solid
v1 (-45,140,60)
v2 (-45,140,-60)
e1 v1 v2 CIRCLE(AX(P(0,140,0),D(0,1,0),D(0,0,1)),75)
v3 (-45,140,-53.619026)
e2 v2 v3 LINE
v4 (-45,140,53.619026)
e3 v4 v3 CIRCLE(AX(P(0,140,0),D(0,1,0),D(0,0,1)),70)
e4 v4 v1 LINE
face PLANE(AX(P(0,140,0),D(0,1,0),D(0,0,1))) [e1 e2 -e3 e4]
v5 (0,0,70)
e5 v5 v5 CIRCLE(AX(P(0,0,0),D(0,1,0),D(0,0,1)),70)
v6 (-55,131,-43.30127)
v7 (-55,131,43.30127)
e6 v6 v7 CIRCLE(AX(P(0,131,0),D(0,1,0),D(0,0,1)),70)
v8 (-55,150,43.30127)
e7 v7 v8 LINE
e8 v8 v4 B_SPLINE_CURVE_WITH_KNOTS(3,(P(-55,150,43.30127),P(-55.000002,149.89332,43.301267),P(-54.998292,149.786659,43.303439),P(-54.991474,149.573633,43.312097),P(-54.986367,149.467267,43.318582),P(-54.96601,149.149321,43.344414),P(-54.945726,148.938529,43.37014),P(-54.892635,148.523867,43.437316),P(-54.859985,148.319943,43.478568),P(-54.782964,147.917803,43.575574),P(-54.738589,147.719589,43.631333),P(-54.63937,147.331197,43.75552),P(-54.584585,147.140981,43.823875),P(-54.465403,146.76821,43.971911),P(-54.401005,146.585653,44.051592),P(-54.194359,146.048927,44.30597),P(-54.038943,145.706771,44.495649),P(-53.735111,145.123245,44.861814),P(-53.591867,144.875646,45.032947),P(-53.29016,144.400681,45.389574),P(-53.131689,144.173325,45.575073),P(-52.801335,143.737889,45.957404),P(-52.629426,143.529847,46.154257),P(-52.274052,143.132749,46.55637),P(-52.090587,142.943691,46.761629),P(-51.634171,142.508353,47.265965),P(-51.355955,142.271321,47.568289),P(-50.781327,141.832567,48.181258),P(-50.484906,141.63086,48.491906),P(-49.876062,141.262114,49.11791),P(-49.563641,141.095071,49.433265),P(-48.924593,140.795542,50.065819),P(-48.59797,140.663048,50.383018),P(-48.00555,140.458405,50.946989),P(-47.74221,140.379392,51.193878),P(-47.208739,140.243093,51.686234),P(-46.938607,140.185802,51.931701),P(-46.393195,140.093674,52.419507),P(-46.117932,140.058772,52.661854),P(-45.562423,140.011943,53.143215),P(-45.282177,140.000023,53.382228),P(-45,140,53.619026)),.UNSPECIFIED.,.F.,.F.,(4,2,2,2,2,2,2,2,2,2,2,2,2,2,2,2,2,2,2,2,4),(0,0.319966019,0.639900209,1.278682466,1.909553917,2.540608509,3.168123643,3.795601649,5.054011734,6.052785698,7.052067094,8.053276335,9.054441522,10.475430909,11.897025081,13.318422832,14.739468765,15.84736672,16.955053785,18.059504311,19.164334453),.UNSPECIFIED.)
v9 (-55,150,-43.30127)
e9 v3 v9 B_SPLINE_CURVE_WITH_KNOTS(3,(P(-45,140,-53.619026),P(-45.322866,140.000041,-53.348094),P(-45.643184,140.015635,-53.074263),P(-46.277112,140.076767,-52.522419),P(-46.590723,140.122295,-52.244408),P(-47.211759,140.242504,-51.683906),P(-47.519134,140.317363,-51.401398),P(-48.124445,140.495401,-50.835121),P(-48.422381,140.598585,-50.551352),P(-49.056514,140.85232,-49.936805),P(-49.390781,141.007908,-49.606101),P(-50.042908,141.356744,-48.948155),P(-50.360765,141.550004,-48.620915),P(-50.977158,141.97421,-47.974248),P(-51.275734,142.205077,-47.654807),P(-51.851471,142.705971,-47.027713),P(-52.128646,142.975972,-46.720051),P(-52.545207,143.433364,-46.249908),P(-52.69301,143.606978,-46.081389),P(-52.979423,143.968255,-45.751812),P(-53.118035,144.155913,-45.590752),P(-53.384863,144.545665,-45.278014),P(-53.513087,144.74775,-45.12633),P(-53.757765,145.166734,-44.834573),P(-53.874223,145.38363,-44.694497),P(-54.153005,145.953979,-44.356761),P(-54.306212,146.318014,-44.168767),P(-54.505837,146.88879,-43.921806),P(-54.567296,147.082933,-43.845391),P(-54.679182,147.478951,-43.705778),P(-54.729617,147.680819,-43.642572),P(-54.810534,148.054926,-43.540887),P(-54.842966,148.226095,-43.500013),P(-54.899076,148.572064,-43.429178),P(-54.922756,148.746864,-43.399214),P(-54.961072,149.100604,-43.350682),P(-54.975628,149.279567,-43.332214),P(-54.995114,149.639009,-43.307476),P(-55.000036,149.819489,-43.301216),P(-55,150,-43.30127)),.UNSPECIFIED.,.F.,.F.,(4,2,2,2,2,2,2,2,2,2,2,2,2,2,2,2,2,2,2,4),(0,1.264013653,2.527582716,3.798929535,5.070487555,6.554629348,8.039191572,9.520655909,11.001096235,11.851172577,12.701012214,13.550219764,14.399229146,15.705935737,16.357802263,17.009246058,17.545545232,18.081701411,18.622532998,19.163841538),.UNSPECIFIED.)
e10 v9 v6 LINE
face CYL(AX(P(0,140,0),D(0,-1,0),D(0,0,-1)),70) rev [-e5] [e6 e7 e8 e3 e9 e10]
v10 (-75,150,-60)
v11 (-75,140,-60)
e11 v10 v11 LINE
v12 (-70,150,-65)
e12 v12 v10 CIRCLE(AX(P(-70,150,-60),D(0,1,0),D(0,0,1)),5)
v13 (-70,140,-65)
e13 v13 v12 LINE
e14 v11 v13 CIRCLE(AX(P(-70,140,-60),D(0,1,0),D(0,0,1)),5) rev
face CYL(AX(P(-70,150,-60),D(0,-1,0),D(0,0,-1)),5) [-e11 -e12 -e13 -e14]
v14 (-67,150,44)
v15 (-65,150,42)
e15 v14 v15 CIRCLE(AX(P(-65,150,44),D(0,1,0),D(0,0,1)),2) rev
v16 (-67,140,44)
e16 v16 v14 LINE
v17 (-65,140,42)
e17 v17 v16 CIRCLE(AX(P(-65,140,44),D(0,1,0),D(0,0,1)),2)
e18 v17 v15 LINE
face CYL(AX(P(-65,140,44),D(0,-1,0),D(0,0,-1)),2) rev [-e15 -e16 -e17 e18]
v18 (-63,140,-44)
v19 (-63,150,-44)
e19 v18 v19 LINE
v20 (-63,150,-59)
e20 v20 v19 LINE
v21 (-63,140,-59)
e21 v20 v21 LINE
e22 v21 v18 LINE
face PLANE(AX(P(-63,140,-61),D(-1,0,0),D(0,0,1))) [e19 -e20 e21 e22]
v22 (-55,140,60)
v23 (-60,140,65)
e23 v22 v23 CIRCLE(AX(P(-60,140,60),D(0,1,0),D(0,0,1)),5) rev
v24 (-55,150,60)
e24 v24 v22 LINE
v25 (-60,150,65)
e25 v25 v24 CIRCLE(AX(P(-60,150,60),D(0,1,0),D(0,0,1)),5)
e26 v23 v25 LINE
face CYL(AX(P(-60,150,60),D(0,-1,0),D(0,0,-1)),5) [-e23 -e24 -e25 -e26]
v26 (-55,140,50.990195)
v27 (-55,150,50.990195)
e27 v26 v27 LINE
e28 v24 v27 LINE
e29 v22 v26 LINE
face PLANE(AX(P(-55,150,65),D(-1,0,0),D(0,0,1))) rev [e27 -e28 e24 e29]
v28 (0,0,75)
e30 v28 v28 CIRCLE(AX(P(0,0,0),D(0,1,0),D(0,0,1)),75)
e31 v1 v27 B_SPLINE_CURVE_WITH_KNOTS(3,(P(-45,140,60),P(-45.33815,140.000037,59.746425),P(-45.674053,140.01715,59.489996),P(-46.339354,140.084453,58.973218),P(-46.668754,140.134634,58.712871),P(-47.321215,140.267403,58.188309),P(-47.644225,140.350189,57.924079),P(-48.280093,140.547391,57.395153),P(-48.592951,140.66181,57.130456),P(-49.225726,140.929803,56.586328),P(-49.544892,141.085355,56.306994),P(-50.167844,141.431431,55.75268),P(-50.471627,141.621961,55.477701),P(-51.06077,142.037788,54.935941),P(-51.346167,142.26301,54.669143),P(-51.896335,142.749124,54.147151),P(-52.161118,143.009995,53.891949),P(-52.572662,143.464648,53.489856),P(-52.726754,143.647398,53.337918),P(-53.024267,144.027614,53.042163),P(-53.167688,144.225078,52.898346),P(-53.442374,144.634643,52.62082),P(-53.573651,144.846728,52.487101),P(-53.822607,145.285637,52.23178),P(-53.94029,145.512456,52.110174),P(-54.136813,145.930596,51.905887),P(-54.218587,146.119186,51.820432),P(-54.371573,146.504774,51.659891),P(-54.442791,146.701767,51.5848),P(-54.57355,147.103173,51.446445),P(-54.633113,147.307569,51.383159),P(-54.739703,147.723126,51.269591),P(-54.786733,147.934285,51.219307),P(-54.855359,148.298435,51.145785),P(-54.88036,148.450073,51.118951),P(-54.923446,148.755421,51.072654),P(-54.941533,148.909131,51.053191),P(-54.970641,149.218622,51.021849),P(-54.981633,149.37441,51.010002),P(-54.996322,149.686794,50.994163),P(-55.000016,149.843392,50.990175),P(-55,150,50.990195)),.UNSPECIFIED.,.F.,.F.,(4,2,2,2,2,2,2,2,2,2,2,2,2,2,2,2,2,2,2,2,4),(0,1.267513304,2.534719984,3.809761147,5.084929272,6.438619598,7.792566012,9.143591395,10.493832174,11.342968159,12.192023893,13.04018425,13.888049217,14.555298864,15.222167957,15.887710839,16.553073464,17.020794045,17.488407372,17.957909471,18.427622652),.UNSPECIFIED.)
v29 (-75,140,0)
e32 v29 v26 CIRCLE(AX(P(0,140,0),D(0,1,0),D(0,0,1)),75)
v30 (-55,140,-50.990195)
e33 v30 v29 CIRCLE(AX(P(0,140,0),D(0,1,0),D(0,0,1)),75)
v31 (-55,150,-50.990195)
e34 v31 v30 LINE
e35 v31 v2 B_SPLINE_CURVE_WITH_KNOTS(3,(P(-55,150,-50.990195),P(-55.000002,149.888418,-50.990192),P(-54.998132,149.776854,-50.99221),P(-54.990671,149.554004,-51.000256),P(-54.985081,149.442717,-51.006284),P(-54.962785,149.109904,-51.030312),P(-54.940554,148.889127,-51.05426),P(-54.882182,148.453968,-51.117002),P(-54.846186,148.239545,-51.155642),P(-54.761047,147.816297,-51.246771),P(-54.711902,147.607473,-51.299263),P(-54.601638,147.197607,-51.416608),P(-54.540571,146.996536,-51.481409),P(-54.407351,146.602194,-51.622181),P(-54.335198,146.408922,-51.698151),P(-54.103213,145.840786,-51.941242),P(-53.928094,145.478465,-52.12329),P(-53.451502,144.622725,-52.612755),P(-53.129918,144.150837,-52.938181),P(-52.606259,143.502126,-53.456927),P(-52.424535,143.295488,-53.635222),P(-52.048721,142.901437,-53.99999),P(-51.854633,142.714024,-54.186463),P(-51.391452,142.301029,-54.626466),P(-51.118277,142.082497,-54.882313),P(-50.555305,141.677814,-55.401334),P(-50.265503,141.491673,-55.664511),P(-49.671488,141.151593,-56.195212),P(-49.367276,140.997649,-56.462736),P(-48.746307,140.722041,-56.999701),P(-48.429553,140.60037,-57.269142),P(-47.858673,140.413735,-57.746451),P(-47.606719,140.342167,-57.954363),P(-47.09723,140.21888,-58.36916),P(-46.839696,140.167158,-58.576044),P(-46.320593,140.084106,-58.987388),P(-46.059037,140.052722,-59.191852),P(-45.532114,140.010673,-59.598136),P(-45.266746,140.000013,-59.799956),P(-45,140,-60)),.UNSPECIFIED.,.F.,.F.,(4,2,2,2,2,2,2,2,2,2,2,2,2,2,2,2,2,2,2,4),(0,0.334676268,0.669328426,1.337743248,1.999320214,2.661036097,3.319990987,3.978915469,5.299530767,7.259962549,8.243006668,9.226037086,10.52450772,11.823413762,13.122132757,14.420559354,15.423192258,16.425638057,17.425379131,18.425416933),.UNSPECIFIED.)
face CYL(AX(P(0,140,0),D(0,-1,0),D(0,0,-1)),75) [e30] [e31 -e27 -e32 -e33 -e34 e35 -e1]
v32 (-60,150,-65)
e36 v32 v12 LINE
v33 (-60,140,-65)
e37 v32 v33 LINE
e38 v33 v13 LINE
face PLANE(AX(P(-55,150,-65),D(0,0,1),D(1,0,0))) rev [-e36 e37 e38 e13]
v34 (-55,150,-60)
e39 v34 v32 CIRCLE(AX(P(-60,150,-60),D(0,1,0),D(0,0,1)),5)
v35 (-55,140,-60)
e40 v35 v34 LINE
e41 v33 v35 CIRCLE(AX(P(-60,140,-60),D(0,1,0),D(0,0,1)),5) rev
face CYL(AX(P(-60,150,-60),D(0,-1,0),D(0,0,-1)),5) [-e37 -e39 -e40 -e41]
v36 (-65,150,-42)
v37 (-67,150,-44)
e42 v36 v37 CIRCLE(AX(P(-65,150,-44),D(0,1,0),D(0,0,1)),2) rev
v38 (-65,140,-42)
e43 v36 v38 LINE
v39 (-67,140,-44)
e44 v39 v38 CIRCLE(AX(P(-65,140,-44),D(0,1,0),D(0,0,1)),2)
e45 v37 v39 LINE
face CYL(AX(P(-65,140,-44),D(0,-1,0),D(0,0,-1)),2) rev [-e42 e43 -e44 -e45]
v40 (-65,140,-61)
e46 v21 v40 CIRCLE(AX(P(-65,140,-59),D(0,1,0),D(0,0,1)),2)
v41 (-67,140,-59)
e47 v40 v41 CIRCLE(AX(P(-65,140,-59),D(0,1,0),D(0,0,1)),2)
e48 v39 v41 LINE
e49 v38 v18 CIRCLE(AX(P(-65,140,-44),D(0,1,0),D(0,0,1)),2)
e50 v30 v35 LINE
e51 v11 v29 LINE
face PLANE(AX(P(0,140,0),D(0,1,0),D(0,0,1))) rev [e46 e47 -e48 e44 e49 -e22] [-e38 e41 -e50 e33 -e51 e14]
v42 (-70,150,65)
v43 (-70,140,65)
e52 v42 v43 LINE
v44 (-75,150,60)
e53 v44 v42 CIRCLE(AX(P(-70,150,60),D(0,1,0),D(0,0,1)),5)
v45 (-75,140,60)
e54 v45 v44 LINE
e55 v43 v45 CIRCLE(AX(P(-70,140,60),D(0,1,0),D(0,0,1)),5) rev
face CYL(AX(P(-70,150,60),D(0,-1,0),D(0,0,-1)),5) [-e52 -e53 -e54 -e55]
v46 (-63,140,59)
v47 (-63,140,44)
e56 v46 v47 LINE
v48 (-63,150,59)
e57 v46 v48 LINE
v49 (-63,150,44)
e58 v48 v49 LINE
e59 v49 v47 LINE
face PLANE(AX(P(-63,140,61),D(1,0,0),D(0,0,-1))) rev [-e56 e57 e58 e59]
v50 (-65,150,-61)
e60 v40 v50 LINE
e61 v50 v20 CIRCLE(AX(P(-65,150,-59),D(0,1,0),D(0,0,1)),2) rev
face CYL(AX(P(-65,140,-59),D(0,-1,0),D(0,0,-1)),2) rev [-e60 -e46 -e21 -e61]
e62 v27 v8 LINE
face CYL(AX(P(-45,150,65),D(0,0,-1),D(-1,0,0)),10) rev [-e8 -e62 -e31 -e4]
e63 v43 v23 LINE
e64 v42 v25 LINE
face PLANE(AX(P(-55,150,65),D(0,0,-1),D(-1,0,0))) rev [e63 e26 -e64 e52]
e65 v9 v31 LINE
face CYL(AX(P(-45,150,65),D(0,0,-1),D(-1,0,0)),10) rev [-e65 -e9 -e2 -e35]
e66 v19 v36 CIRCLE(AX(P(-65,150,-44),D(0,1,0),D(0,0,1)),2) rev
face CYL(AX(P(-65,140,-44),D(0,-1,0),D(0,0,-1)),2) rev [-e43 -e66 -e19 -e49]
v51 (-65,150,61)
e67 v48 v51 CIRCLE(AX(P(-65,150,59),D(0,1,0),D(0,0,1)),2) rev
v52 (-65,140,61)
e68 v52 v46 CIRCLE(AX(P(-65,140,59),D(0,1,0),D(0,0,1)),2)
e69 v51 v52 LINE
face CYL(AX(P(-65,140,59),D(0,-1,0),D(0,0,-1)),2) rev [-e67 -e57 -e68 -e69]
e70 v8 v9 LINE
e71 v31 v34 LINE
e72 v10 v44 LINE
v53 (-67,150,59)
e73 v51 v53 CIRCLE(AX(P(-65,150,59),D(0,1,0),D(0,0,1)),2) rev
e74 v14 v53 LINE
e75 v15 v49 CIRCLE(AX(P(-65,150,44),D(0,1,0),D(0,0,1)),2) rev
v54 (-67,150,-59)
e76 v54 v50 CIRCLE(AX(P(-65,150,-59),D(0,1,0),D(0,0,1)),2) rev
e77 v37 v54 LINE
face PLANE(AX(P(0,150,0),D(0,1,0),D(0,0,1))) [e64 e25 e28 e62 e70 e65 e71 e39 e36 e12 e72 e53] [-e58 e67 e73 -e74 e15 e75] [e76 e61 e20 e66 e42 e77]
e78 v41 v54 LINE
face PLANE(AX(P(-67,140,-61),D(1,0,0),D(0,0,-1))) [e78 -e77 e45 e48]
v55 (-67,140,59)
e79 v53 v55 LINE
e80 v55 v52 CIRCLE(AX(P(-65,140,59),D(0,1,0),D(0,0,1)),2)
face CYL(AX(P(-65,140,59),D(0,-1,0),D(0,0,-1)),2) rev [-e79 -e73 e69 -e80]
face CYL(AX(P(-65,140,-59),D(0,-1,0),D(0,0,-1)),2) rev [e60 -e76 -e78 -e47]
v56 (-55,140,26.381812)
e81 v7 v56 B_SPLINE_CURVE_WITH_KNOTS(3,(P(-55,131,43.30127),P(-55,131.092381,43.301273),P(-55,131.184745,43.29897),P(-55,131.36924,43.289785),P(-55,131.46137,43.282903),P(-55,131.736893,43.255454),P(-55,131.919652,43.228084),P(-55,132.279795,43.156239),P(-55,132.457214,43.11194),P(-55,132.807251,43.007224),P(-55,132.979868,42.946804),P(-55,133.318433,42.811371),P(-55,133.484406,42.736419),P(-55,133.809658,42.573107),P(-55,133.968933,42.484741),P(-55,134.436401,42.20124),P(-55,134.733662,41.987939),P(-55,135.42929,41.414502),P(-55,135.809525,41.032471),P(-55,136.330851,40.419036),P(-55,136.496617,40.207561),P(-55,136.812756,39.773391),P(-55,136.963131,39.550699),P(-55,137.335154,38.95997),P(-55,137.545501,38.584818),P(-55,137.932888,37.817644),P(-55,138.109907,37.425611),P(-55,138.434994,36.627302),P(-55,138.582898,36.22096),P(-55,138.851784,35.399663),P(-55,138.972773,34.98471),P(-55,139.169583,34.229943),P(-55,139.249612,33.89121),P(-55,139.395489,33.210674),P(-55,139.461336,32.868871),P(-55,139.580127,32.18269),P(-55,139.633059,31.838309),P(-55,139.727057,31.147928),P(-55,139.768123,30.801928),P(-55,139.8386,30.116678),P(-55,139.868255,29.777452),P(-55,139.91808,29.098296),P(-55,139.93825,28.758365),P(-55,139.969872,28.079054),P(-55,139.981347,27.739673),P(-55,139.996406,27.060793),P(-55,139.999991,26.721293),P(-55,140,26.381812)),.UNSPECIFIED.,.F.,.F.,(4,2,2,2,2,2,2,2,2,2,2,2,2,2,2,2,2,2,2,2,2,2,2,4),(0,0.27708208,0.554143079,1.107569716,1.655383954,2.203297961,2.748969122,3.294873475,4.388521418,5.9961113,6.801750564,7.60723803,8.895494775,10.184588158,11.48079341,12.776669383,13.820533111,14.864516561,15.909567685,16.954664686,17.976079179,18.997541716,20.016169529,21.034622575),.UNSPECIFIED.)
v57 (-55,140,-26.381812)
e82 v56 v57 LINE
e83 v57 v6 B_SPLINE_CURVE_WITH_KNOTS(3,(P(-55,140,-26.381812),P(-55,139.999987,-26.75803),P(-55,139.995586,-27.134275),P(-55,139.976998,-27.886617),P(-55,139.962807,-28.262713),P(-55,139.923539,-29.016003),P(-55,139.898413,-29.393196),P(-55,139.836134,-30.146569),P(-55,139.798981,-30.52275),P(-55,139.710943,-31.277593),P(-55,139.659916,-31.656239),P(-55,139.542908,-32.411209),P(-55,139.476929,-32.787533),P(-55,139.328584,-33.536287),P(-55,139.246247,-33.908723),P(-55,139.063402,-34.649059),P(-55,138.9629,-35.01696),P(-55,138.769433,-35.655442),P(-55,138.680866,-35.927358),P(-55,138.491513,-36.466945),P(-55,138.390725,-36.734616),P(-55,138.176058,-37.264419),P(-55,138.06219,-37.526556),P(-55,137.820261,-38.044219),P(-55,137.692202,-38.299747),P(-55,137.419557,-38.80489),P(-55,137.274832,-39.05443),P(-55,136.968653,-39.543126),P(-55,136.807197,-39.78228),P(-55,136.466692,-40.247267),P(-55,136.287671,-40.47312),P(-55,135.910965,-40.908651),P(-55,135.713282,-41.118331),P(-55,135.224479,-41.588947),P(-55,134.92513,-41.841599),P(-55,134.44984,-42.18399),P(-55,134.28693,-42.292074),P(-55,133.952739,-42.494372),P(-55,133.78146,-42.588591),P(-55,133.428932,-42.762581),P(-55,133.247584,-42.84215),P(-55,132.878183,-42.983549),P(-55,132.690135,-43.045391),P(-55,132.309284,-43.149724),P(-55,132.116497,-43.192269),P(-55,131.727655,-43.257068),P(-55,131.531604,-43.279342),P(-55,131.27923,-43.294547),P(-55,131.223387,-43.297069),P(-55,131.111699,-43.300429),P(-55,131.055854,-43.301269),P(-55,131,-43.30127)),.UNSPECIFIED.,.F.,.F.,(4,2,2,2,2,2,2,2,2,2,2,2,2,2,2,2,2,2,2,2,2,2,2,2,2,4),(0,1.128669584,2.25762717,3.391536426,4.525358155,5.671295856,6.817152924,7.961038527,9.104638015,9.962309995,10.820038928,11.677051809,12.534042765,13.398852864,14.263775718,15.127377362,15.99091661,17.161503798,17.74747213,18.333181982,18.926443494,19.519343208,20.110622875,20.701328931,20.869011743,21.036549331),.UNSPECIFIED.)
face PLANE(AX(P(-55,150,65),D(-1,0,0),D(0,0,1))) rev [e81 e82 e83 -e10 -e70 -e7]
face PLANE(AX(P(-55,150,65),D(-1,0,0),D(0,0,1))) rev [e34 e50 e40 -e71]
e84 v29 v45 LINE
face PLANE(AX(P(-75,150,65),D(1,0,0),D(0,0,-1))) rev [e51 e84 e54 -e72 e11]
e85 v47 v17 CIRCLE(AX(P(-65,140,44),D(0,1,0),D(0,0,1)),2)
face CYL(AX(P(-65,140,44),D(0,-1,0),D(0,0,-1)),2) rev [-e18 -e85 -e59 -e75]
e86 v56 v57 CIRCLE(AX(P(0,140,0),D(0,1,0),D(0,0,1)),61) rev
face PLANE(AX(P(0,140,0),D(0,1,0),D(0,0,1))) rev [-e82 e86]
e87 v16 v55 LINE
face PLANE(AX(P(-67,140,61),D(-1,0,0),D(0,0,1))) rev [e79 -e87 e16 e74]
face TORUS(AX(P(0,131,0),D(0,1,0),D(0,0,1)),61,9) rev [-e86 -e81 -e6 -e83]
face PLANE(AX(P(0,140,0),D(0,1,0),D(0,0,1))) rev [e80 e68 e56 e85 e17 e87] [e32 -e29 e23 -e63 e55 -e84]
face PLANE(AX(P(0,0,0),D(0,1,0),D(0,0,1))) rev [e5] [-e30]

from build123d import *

# Parameters (mm, degrees)
SKETCH1_R            = 75
SKETCH1_R_2          = 70
BOSS_EXTRUDE1_DEPTH  = 140
SKETCH2_W            = 20
SKETCH2_H            = 130
BOSS_EXTRUDE2_DEPTH  = 10
FILLET1_R            = 9
FILLET2_R            = 10
FILLET3_R            = 5
SKETCH5_W            = 4
SKETCH5_H            = 19
CUT_EXTRUDE1_DEPTH   = 10
FILLET4_R            = 2
FILLET4_OF_MIRROR4_R = 2


# Some blends are built 0.0001 mm under size
with BuildPart() as part:
    # Sketch1 → Boss-Extrude1 (new body)
    with BuildSketch(Plane(origin=(0, 0, 0), x_dir=(1, 0, 0), z_dir=(0, 1, 0))):
        with Locations(Location((0, 0, 0), (0, 0, 270))):
            Circle(SKETCH1_R)
        with Locations(Location((0, 0, 0), (0, 0, 270))):
            Circle(SKETCH1_R_2, mode=Mode.SUBTRACT)
    extrude(amount=BOSS_EXTRUDE1_DEPTH)

    # Sketch2 → Boss-Extrude2 (add)
    with BuildSketch(Plane(origin=(0, 140, 0), x_dir=(1, 0, 0), z_dir=(0, 1, 0))):
        with Locations((-65, 0)):
            Rectangle(SKETCH2_W, SKETCH2_H)
    extrude(amount=BOSS_EXTRUDE2_DEPTH)

    # Fillet1
    # the kernel refuses this fillet: 9 mm, written as the material it adds along each edge
    with BuildSketch(Plane(origin=(0, 140, 0), x_dir=(-0.5499699922766536, 0, -0.835184415321082), z_dir=(0.835184415321082, 0, -0.5499699922766536))) as fillet1_piece_1_section:
        with BuildLine():
            CenterArc((70 - FILLET1_R, -FILLET1_R), FILLET1_R, 0, 90)
            Line((70 - FILLET1_R, 0), (70, 0))
            Line((70, 0), (70, -FILLET1_R))
        make_face()
    fillet1_piece_1 = revolve(axis=Axis((0, 140, 0), (0, 1, 0)), revolution_arc=113.270091323, mode=Mode.PRIVATE)
    fillet1_piece_1 = split(fillet1_piece_1, bisect_by=Plane(origin=(-55, 137.444603365, 0), z_dir=(-1, 0, 0)), keep=Keep.TOP, mode=Mode.PRIVATE)
    add(fillet1_piece_1)

    # Fillet2
    # the kernel refuses this fillet: 10 mm, written as the material it adds along each edge
    with BuildSketch(Plane(origin=(-55, 140, -75.990195136), x_dir=(0, 1, 0), z_dir=(0, 0, 1))) as fillet2_piece_1_section:
        with BuildLine():
            CenterArc((FILLET2_R, -FILLET2_R), FILLET2_R, 90, 90)
            Line((0, -FILLET2_R), (0, 0))
            Line((0, 0), (FILLET2_R, 0))
        make_face()
    fillet2_piece_1 = extrude(amount=57.688924947, mode=Mode.PRIVATE)
    fillet2_piece_1 = fillet2_piece_1 - Plane(origin=(0, 142.276585478, 0), x_dir=(0, 0, 1), z_dir=(0, -1, 0)) * Cylinder(70, 156, mode=Mode.PRIVATE)
    fillet2_piece_1 = fillet2_piece_1 & Plane(origin=(0, 142.276585478, 0), x_dir=(0, 0, 1), z_dir=(0, -1, 0)) * Cylinder(75, 156, mode=Mode.PRIVATE)
    add(fillet2_piece_1)
    with BuildSketch(Plane(origin=(-55, 140, 18.301270189), x_dir=(0, 1, 0), z_dir=(0, 0, 1))) as fillet2_piece_2_section:
        with BuildLine():
            CenterArc((FILLET2_R, -FILLET2_R), FILLET2_R, 90, 90)
            Line((0, -FILLET2_R), (0, 0))
            Line((0, 0), (FILLET2_R, 0))
        make_face()
    fillet2_piece_2 = extrude(amount=57.688924947, mode=Mode.PRIVATE)
    fillet2_piece_2 = fillet2_piece_2 - Plane(origin=(0, 142.276601392, 0), x_dir=(0, 0, 1), z_dir=(0, -1, 0)) * Cylinder(70, 156, mode=Mode.PRIVATE)
    fillet2_piece_2 = fillet2_piece_2 & Plane(origin=(0, 142.276601392, 0), x_dir=(0, 0, 1), z_dir=(0, -1, 0)) * Cylinder(75, 156, mode=Mode.PRIVATE)
    add(fillet2_piece_2)

    # Fillet3
    fillet3_edges = [part.edges().sort_by_distance(p)[0] for p in [
        (-75, 145, -65),
        (-75, 145, 65),
        (-55, 145, 65),
        (-55, 145, -65),
    ]]
    fillet(fillet3_edges, radius=FILLET3_R)

    # Sketch5 → Cut-Extrude1 (cut)
    with BuildSketch(Plane(origin=(0, 150, 0), x_dir=(1, 0, 0), z_dir=(0, 1, 0))):
        with Locations((-65, -51.5)):
            Rectangle(SKETCH5_W, SKETCH5_H)
    cut_extrude1 = extrude(amount=-CUT_EXTRUDE1_DEPTH, mode=Mode.SUBTRACT)

    # Fillet4
    fillet4_edges = [part.edges().sort_by_distance(p)[0] for p in [
        (-67, 145, 42),
        (-63, 145, 42),
        (-67, 145, 61),
        (-63, 145, 61),
    ]]
    fillet(fillet4_edges, radius=FILLET4_R - 0.0001)  # a hair under: the kernel refuses the full size

    # Mirror4: Cut-Extrude1 across plane
    add(cut_extrude1.mirror(Plane.XY), mode=Mode.SUBTRACT)

    # Fillet4 of Mirror4
    fillet4_of_mirror4_edges = [part.edges().sort_by_distance(p)[0] for p in [
        (-67, 145, -42),
        (-63, 145, -42),
        (-67, 145, -61),
        (-63, 145, -61),
    ]]
    fillet(fillet4_of_mirror4_edges, radius=FILLET4_OF_MIRROR4_R - 0.0001)  # a hair under: the kernel refuses the full size


solid = part.part
